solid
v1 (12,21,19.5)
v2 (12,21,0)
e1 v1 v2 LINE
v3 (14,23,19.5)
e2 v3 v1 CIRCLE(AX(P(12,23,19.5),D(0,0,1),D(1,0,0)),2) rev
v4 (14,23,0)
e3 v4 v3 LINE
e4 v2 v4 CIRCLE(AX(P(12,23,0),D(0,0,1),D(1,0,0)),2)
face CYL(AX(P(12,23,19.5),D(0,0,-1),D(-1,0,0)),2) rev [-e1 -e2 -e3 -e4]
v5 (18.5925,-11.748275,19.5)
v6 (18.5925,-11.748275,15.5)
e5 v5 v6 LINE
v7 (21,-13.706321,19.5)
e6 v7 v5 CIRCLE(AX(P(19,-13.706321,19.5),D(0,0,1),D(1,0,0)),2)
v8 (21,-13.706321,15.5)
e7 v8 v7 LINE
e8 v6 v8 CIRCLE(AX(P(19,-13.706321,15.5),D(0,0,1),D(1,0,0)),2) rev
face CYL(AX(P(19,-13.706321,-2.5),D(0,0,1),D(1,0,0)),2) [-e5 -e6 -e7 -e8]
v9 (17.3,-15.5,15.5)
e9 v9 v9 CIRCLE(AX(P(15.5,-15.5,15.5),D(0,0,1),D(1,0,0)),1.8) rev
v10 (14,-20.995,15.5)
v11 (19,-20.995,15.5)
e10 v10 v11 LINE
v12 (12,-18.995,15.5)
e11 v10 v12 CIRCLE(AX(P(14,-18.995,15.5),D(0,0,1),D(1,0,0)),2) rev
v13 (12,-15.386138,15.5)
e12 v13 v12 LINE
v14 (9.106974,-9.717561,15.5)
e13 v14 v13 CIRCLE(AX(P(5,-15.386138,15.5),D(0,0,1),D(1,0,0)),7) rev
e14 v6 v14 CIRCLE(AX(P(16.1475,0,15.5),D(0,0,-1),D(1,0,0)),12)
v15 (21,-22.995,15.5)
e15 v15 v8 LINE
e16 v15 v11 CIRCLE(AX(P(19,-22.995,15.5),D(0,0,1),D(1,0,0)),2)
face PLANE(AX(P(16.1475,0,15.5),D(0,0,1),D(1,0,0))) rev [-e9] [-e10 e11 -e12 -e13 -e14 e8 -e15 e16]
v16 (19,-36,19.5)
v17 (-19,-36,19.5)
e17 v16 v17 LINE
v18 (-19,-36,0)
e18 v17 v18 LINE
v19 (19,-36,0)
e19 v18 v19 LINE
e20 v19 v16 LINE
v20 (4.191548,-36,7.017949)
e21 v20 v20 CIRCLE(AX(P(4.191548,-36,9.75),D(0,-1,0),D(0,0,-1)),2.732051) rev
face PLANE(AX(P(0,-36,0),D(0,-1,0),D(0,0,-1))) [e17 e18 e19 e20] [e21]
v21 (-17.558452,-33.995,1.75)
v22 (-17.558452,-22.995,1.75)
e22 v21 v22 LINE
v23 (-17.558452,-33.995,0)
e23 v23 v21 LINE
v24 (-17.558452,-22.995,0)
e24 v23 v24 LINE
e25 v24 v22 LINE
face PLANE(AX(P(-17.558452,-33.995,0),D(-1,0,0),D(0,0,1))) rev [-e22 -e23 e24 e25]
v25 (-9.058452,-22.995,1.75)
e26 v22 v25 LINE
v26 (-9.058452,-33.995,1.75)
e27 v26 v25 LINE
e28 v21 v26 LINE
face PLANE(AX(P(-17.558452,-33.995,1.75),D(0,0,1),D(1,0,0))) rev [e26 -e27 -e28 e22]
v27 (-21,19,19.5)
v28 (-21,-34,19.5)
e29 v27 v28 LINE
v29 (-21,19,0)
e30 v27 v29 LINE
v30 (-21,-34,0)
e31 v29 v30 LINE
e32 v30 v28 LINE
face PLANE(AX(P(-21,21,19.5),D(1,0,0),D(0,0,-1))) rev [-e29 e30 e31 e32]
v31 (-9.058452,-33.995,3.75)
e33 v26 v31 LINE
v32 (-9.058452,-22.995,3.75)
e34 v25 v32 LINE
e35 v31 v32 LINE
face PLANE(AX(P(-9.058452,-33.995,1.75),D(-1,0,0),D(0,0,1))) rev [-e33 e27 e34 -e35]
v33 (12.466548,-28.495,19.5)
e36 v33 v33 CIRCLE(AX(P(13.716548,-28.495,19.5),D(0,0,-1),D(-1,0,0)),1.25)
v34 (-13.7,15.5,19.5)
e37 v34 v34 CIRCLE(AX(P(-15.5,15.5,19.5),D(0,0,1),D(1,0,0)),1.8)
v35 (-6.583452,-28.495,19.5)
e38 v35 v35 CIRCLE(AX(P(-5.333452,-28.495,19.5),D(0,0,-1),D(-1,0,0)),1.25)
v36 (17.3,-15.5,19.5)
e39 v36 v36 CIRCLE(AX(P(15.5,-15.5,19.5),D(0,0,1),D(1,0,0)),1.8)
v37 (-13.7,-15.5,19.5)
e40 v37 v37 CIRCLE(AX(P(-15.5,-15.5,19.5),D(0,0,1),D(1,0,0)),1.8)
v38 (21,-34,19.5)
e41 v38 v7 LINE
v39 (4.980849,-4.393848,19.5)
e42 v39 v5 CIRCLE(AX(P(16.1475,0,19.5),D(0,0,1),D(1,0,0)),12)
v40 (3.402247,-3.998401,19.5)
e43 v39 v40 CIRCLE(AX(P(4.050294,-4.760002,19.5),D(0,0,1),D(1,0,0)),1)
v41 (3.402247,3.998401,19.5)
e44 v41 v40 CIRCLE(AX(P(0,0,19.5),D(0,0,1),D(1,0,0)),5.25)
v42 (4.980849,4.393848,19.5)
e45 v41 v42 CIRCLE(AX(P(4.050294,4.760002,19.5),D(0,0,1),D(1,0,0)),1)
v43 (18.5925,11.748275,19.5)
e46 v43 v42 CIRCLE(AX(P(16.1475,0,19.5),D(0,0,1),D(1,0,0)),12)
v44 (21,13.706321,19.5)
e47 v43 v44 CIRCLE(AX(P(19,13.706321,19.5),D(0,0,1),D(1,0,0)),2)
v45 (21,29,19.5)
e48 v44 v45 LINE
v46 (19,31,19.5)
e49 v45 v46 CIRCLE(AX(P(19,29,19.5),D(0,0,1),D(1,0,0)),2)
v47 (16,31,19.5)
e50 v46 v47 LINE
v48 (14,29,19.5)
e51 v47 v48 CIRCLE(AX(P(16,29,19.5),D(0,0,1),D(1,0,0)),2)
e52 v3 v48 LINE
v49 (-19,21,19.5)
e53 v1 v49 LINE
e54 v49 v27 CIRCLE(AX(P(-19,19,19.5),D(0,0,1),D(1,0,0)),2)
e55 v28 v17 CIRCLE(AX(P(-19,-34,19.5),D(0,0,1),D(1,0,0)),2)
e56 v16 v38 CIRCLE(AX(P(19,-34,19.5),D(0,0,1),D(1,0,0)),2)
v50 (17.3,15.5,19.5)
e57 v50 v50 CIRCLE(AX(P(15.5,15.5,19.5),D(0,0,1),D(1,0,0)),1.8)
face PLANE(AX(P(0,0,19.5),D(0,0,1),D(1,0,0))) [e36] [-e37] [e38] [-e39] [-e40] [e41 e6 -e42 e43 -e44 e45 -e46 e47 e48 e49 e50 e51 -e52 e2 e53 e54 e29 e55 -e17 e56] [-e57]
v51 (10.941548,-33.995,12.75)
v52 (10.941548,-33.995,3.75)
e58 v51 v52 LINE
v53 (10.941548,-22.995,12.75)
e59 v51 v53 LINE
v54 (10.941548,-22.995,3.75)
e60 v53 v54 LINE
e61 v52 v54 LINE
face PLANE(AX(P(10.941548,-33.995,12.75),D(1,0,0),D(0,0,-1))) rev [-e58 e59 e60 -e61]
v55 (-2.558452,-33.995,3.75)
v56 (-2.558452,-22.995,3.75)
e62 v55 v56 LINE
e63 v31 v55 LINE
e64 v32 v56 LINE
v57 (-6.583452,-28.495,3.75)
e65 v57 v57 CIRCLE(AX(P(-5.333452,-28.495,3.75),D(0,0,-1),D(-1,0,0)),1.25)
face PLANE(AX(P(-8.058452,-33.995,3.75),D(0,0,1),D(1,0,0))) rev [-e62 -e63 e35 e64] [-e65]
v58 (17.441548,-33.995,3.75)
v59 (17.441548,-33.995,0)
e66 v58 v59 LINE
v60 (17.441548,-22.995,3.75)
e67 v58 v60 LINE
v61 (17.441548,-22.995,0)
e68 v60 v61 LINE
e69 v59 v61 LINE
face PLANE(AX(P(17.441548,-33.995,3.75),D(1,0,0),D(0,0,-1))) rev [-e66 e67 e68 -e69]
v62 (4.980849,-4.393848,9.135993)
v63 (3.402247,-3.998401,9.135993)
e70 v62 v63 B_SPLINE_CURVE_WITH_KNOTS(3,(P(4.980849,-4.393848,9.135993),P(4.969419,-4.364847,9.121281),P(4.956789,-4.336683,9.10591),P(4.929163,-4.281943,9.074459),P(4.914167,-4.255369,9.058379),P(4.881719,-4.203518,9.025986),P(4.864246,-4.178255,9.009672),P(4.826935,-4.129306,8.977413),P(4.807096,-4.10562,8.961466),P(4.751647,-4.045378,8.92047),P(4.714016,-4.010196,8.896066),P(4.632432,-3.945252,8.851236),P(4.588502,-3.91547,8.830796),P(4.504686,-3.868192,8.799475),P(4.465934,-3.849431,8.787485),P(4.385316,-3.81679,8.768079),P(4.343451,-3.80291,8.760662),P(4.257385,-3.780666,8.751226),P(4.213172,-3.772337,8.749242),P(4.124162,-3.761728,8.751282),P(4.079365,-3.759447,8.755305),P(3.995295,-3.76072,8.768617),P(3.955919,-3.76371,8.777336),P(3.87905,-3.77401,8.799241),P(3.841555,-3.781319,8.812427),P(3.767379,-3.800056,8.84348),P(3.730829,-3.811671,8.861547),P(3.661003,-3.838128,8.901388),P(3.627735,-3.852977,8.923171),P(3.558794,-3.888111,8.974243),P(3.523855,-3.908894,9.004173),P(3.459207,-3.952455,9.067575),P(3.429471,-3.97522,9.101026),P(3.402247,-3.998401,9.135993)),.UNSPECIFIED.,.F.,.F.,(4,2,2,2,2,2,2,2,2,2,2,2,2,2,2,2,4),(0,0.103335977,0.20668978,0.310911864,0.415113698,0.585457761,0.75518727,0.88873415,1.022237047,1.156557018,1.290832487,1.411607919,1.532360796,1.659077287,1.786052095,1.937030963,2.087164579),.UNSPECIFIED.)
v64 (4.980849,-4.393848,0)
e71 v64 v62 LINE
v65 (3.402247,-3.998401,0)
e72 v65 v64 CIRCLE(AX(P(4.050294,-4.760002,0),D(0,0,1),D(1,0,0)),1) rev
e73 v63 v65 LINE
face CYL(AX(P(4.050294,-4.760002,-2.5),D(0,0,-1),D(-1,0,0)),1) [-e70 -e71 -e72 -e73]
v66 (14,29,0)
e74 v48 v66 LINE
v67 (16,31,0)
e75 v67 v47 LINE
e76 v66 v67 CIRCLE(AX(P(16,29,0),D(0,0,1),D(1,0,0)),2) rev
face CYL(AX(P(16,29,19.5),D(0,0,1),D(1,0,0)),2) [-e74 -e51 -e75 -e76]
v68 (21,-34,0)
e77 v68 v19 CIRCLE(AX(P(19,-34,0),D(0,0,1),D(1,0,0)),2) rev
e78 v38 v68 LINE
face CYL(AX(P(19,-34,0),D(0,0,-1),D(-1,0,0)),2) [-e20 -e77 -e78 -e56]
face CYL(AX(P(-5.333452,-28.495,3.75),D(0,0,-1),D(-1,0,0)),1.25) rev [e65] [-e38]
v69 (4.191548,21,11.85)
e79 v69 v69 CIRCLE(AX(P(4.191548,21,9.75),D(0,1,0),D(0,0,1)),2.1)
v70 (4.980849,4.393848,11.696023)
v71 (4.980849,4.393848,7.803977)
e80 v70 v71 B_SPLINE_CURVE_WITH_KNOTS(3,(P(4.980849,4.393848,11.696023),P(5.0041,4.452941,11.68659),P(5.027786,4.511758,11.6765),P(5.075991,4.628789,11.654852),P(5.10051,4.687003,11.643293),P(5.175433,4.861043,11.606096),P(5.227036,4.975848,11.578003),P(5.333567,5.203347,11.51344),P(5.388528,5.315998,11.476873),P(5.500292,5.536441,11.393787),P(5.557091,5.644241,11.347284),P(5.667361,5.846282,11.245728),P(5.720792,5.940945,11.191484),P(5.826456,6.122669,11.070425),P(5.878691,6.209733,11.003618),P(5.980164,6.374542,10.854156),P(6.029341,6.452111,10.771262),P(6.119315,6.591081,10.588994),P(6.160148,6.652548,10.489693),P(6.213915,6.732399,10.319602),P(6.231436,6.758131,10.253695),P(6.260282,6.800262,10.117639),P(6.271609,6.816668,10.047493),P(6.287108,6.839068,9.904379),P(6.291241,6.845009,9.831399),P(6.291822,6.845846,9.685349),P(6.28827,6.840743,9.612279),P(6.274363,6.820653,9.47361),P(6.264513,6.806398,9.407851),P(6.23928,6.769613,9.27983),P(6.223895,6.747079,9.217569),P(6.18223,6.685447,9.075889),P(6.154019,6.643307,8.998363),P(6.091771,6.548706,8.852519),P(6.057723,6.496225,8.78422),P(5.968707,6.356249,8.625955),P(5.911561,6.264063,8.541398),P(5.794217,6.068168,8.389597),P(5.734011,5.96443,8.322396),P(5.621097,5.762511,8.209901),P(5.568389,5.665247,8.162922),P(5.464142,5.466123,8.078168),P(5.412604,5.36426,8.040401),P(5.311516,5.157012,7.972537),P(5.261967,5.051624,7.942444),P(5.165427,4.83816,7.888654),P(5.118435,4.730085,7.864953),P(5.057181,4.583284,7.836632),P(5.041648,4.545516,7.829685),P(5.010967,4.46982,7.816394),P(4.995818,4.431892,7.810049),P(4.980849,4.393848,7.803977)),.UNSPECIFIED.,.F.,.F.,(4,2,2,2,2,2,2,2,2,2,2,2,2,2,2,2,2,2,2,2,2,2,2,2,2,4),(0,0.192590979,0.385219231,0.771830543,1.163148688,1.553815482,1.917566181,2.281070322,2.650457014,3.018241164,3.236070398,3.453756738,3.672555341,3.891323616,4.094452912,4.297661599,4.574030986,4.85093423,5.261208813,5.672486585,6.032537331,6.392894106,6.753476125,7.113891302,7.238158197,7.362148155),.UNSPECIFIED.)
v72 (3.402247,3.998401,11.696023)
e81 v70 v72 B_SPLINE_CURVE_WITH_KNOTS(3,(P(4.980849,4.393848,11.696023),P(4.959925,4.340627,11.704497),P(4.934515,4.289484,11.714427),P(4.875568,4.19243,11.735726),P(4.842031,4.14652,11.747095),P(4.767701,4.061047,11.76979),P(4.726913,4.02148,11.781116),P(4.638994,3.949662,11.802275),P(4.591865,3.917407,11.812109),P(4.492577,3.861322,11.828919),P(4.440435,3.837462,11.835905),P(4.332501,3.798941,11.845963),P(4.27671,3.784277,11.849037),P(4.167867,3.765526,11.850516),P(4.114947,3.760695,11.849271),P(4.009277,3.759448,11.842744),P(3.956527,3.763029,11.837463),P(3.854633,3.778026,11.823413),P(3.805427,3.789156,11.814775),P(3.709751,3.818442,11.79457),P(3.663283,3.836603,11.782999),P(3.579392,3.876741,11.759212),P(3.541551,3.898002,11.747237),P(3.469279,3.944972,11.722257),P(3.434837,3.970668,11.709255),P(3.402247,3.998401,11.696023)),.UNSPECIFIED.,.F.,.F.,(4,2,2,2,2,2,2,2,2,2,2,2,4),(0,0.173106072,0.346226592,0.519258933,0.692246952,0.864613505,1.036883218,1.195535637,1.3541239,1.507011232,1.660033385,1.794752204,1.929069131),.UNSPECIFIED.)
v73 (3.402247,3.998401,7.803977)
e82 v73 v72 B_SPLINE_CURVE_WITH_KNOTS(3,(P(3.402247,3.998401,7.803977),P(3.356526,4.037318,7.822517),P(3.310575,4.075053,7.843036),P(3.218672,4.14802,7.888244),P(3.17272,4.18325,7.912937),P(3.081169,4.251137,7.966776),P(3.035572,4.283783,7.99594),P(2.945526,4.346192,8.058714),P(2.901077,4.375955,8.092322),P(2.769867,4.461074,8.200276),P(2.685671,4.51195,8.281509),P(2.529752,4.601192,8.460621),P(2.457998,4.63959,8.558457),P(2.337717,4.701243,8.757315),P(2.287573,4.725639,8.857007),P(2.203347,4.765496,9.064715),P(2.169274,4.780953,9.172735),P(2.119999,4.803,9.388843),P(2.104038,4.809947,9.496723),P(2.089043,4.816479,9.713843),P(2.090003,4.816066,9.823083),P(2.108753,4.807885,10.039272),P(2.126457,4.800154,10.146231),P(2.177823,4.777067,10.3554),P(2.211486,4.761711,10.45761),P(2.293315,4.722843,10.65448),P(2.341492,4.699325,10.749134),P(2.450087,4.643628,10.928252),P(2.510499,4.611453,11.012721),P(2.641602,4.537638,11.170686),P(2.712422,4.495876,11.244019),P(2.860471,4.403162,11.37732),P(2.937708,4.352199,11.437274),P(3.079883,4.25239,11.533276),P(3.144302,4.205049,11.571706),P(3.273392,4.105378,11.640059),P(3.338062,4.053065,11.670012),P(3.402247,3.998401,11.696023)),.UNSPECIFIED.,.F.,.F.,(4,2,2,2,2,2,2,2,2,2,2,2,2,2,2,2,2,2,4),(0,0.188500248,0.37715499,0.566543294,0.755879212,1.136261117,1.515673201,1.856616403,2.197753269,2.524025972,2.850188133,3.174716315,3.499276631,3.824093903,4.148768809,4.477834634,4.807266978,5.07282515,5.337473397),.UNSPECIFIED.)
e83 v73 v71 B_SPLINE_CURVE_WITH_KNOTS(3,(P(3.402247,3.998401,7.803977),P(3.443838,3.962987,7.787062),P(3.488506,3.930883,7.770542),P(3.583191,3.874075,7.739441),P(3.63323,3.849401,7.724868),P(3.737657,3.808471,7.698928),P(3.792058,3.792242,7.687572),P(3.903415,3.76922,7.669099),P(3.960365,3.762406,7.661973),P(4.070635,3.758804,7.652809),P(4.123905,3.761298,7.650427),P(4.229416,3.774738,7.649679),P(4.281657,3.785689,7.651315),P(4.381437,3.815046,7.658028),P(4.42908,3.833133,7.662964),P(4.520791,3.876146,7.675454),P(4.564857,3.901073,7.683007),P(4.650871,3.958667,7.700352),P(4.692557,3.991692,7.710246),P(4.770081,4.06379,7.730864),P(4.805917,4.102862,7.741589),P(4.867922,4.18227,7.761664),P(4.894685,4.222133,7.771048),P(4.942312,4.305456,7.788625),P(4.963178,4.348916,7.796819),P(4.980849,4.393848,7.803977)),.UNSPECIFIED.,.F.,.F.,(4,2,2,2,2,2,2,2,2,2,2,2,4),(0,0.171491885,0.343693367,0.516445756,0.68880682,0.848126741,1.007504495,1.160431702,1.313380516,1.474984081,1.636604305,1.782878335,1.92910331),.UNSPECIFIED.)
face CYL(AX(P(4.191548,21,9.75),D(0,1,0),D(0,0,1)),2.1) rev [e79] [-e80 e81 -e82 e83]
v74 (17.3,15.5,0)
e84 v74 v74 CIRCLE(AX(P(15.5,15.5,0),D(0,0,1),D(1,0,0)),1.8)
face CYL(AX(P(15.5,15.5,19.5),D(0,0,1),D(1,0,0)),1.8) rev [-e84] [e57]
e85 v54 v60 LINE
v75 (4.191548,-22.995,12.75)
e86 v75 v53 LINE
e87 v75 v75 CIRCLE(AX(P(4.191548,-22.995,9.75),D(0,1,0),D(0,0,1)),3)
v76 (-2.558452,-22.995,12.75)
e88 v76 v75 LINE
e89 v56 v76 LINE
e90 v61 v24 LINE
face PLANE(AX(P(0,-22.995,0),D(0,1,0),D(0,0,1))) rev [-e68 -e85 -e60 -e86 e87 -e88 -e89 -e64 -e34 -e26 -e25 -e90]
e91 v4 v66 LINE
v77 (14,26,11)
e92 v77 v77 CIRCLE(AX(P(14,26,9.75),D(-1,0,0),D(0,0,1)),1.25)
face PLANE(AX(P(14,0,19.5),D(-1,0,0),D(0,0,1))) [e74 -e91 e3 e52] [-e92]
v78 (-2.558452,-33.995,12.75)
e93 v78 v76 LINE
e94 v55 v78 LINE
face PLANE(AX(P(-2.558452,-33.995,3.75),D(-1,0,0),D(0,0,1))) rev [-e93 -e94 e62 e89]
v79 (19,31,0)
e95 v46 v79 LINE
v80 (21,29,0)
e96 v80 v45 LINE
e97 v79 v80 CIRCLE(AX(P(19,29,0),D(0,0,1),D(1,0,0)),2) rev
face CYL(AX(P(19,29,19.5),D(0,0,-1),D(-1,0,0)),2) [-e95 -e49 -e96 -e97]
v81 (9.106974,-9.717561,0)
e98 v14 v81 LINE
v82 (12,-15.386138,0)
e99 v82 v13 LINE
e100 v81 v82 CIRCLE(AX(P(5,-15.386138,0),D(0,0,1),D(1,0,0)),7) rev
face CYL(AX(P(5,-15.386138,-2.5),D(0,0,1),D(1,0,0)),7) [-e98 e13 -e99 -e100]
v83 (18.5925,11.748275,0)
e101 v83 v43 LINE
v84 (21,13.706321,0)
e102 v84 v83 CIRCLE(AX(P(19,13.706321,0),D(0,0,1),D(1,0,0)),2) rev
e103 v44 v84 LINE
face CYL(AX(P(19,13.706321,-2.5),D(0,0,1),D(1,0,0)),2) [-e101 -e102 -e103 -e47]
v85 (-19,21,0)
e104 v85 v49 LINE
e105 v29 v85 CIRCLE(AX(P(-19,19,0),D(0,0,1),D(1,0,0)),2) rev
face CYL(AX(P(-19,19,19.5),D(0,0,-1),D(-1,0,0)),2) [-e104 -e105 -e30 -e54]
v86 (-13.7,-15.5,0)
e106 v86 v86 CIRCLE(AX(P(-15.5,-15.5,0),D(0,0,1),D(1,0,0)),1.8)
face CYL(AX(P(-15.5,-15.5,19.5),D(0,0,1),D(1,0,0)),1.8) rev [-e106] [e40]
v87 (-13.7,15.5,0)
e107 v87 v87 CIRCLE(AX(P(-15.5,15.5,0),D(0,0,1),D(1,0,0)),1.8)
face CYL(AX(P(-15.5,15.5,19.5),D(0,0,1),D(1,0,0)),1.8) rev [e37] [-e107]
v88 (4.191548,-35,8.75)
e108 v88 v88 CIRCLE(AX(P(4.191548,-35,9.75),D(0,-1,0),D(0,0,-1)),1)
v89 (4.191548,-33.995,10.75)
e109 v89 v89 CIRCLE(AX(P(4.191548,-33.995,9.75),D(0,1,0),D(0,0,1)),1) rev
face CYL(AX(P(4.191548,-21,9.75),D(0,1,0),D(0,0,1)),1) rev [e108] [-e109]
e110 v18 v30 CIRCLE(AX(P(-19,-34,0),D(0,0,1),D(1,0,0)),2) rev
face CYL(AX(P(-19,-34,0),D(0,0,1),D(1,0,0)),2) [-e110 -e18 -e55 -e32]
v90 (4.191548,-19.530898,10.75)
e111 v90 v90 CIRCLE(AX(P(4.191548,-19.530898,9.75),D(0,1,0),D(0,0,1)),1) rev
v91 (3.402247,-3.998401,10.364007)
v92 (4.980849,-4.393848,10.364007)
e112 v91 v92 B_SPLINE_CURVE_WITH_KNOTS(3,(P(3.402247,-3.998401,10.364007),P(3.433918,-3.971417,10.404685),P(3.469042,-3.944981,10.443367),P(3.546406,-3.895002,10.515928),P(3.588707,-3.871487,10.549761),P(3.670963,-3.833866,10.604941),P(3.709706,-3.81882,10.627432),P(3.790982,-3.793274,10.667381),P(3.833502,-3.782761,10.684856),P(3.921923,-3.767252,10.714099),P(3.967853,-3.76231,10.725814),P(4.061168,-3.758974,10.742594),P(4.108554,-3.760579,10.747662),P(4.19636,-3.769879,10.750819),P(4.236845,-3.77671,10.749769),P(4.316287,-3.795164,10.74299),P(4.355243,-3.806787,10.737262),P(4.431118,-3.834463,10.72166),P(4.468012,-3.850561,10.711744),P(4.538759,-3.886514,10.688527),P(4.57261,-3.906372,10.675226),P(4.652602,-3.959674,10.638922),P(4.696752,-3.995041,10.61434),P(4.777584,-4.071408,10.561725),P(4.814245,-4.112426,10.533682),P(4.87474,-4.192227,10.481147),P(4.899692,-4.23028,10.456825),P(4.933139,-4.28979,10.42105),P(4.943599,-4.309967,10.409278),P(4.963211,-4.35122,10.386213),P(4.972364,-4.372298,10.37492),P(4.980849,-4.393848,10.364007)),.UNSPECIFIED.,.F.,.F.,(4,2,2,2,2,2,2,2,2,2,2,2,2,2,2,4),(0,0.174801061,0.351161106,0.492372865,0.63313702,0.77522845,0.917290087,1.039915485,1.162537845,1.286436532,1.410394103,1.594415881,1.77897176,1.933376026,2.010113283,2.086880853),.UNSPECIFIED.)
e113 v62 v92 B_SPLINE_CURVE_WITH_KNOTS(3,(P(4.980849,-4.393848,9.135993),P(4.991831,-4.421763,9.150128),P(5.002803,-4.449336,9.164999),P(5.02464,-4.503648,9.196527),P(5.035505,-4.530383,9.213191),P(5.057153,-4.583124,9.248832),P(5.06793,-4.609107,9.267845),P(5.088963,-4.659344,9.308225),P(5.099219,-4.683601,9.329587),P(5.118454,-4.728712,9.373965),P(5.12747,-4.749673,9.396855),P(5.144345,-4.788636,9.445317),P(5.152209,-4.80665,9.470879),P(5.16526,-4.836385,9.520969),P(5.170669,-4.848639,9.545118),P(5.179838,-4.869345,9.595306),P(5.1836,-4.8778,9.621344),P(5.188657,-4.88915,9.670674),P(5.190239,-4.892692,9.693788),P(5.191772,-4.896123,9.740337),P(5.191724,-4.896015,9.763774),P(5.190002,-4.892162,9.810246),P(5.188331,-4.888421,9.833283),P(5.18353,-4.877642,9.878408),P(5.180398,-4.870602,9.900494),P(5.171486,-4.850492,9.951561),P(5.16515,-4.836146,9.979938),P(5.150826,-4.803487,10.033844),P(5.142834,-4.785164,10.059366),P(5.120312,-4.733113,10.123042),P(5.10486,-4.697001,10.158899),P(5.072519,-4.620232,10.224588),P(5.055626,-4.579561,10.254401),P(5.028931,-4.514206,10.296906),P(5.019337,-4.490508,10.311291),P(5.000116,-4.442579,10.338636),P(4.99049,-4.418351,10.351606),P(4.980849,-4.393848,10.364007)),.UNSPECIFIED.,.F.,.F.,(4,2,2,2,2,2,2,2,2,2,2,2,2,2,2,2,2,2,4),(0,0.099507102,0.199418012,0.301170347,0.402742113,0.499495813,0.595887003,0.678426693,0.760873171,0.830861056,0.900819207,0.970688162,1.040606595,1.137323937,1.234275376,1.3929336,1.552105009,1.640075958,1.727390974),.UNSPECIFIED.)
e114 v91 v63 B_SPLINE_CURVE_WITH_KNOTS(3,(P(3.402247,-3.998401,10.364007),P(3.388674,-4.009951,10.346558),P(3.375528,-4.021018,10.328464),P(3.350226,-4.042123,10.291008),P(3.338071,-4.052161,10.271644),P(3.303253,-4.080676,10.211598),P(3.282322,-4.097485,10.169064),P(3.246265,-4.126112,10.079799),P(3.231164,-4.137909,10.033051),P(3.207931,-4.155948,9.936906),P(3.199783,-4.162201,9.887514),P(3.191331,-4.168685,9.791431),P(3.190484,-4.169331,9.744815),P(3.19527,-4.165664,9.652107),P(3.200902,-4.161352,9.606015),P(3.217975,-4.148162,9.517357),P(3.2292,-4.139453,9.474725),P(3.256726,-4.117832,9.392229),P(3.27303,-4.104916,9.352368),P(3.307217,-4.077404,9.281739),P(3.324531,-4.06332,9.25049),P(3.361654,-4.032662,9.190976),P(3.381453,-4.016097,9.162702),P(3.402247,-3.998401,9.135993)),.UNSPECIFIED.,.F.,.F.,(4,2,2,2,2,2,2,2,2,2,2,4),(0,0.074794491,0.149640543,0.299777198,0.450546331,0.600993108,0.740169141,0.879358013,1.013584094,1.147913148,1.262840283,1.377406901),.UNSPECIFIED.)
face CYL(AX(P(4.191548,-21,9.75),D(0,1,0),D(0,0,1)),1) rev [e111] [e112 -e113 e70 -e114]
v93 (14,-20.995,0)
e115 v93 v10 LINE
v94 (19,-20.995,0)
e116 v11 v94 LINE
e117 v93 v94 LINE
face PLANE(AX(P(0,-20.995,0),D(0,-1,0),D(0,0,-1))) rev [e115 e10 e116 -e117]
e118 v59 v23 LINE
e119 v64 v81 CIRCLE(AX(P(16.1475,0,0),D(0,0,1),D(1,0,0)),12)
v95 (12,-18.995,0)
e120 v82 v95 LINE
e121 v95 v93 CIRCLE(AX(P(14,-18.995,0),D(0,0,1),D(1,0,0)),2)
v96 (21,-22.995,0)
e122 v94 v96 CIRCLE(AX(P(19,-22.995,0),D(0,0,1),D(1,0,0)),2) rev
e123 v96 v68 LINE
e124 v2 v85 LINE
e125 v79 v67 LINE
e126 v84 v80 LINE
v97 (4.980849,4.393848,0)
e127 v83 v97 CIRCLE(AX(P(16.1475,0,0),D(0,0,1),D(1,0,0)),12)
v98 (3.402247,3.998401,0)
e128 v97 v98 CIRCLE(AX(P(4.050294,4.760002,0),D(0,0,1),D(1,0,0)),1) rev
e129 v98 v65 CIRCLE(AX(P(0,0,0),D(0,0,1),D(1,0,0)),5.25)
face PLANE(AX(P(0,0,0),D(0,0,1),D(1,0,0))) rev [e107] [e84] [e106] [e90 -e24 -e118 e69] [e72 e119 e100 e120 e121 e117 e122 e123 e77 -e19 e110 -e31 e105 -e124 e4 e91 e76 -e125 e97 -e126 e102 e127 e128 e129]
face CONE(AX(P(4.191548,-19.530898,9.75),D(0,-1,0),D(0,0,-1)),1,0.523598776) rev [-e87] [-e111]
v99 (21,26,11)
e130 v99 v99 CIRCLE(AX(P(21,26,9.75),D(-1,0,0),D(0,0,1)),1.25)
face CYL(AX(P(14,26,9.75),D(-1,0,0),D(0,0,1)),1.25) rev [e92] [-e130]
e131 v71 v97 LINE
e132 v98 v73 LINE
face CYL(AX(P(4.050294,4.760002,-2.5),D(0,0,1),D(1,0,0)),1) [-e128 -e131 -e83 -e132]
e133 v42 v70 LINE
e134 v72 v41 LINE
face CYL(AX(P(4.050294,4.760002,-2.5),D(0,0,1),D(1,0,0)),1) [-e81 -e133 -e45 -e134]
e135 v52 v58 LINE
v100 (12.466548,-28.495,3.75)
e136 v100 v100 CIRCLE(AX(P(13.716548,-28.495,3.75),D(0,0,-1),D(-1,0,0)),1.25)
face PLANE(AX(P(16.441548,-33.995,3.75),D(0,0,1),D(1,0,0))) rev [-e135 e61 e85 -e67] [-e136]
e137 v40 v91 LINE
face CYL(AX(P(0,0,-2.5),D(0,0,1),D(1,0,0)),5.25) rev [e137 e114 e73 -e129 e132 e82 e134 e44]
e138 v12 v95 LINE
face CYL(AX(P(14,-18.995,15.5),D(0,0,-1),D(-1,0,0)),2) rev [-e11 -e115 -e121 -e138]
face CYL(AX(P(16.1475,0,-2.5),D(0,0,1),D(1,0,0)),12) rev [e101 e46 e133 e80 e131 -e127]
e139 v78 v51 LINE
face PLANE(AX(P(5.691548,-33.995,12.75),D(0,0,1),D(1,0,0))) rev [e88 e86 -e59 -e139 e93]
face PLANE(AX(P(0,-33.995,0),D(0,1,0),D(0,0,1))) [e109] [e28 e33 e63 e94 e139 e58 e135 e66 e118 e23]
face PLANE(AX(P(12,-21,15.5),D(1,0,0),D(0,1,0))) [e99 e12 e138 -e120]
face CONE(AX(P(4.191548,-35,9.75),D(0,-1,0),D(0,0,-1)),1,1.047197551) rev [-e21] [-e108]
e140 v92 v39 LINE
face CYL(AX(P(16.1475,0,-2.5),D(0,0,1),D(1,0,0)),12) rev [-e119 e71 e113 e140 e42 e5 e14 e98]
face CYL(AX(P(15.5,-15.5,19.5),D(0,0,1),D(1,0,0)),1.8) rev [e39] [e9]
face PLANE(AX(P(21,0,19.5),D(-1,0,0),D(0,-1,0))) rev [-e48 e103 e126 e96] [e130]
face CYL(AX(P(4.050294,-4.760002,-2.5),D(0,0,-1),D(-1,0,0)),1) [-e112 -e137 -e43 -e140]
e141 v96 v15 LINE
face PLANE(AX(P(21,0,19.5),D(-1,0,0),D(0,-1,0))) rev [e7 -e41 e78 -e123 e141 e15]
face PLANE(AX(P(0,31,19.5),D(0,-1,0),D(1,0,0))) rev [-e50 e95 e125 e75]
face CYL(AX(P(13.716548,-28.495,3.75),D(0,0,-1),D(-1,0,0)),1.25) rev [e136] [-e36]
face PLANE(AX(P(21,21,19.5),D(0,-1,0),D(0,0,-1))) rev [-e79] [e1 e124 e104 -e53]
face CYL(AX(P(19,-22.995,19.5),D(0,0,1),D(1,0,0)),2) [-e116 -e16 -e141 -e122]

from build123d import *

# Parameters (mm, degrees)
BOSS_EXTRUDE1_DEPTH       = 19.5
SKETCH2_R                 = 5.25
HOBB_CLEARANCE_DEPTH      = 22
M3_CLEARANCE_HOLE1_D      = 3.6
SKETCH6_R                 = 12
CUT_EXTRUDE2_DEPTH        = 22
CUT_EXTRUDE3_START        = 15.5
CUT_EXTRUDE3_DEPTH        = 15.5
M3X0_5_TAPPED_HOLE1_D     = 2.5
FILLET1_R                 = 1
M5X0_8_TAPPED_HOLE1_D     = 4.2
M5X0_8_TAPPED_HOLE1_DEPTH = 21
M5X0_8_TAPPED_HOLE1_TIP   = 1.2618073
SKETCH12_R                = 1
CUT_EXTRUDE4_DEPTH        = 51.845353932
BOSS_EXTRUDE2_DEPTH       = 15
BOSS_EXTRUDE2_DEPTH_BACK  = 0.005
SKETCH14_W                = 42
SKETCH14_H                = 19.5
SKETCH15_R                = 1
CUT_EXTRUDE6_DEPTH        = 26.51413021
CUT_EXTRUDE7_START        = -2
CUT_EXTRUDE7_DEPTH        = 11
M3X0_5_TAPPED_HOLE2_D     = 2.5
FILLET3_R                 = 2
CHAMFER2_SIZE             = 1
CHAMFER2_SIZE2            = 1.732050808
FILLET4_START             = -1
FILLET4_DEPTH             = 16.5


with BuildPart() as part:
    # Sketch1 → Boss-Extrude1 (new body)
    with BuildSketch(Plane.XY):
        Polygon((21, -21), (21, 31), (14, 31), (14, 21), (-21, 21), (-21, -21), align=None)
    extrude(amount=BOSS_EXTRUDE1_DEPTH)

    # Sketch2 → Hobb Clearance (cut)
    with BuildSketch(Plane.XY.offset(19.5)):
        Circle(SKETCH2_R)
    extrude(amount=-HOBB_CLEARANCE_DEPTH, mode=Mode.SUBTRACT)

    # M3 Clearance Hole1 (through all)
    with Locations(Plane.XY.offset(19.5)):
        with Locations((-15.5, 15.5), (15.5, 15.5), (15.5, -15.5), (-15.5, -15.5)):
            Hole(M3_CLEARANCE_HOLE1_D / 2)

    # Sketch6 → Cut-Extrude2 (cut)
    with BuildSketch(Plane.XY.offset(19.5)):
        with Locations((16.1475, 0)):
            Circle(SKETCH6_R)
    extrude(amount=-CUT_EXTRUDE2_DEPTH, mode=Mode.SUBTRACT)

    # Sketch7 → Cut-Extrude3 (cut)
    with BuildSketch(Plane.XY.offset(CUT_EXTRUDE3_START)):
        with BuildLine():
            Line((21, -10.975119305), (21, -21))
            Line((21, -21), (12, -21))
            Line((12, -21), (12, -11.260472626))
            ThreePointArc((12, -11.260472626), (16.527780001, -11.99397295), (21, -10.975119305))
        make_face()
    extrude(amount=-CUT_EXTRUDE3_DEPTH, mode=Mode.SUBTRACT)

    # M3x0.5 Tapped Hole1 (through all)
    with Locations(Plane.ZY.offset(-14)):
        with Locations((9.75, 26)):
            Hole(M3X0_5_TAPPED_HOLE1_D / 2)

    # Fillet1
    fillet1_edges = [part.edges().sort_by_distance(p)[0] for p in [
        (4.468315722, -2.756202933, 9.75),
        (4.468315722, 2.756202933, 9.75),
    ]]
    fillet(fillet1_edges, radius=FILLET1_R)

    # M5x0.8 Tapped Hole1
    with Locations(Plane(origin=(0, 21, 0), x_dir=(1, 0, 0), z_dir=(0, 1, 0))):
        with Locations((4.191547948, -9.75)):
            Hole(M5X0_8_TAPPED_HOLE1_D / 2, depth=M5X0_8_TAPPED_HOLE1_DEPTH)
            with Locations((0, 0, -(M5X0_8_TAPPED_HOLE1_DEPTH + M5X0_8_TAPPED_HOLE1_TIP / 2))):  # 118° drill point
                Cone(0, M5X0_8_TAPPED_HOLE1_D / 2, M5X0_8_TAPPED_HOLE1_TIP, mode=Mode.SUBTRACT)

    # Sketch12 → Cut-Extrude4 (cut, through all)
    with BuildSketch(Plane(origin=(0, 21, 0), x_dir=(1, 0, 0), z_dir=(0, 1, 0))):
        with Locations(Location((4.191547948, -9.75, 0), (0, 0, 270))):
            Circle(SKETCH12_R)
    extrude(amount=-CUT_EXTRUDE4_DEPTH, mode=Mode.SUBTRACT)

    # Sketch14 → Boss-Extrude2 (add, two sides: drawn at the far end of the back side and taken through both)
    with BuildSketch(Plane.XZ.offset(21).offset(-BOSS_EXTRUDE2_DEPTH_BACK)):
        with Locations((0, 9.75)):
            Rectangle(SKETCH14_W, SKETCH14_H)
    extrude(amount=BOSS_EXTRUDE2_DEPTH + BOSS_EXTRUDE2_DEPTH_BACK)

    # Sketch15 → Cut-Extrude6 (cut)
    with BuildSketch(Plane(origin=(0, -20.995, 0), x_dir=(1, 0, 0), z_dir=(0, 1, 0))):
        with Locations(Location((4.191547948, -9.75, 0), (0, 0, 322.12020771))):
            Circle(SKETCH15_R)
    extrude(amount=-CUT_EXTRUDE6_DEPTH, mode=Mode.SUBTRACT)

    # Sketch16 → Cut-Extrude7 (cut)
    with BuildSketch(Plane(origin=(0, -20.995, 0), x_dir=(1, 0, 0), z_dir=(0, 1, 0)).offset(CUT_EXTRUDE7_START)):
        Polygon((-17.558452052, -1.75), (-9.058452052, -1.75), (-9.058452052, -3.75), (-8.058452052, -3.75), (-2.558452052, -3.75), (-2.558452052, -12.75), (2.691547948, -12.75), (5.691547948, -12.75), (10.941547948, -12.75), (10.941547948, -3.75), (16.441547948, -3.75), (17.441547948, -3.75), (17.441547948, 0), (-17.558452052, 0), (-17.558452052, -0.75), align=None)
    extrude(amount=-CUT_EXTRUDE7_DEPTH, mode=Mode.SUBTRACT)

    # M3x0.5 Tapped Hole2 (through all)
    with Locations(Plane(origin=(0, 0, 3.75), x_dir=(-1, 0, 0), z_dir=(0, 0, -1))):
        with Locations((5.333452052, -28.495), (-13.716547948, -28.495)):
            Hole(M3X0_5_TAPPED_HOLE2_D / 2)

    # Chamfer1: read off the stored shape, not the designer's step
    # Chamfer1 outline → Chamfer1 (revolve, cut)
    with BuildSketch(Plane(origin=(4.191547948, 0, 9.75), x_dir=(1, 0, 0), z_dir=(0, 0, 1))):
        Polygon((3, -22.995), (1, -19.530898385), (1, -22.995), align=None)
    revolve(axis=Axis((4.191547948, 0, 9.75), (0, 1, 0)), mode=Mode.SUBTRACT)

    # Fillet3
    fillet3_edges = [part.edges().sort_by_distance(p)[0] for p in [
        (21, -20.995, 7.75),
        (12, -20.995, 7.75),
        (-21, -36, 9.75),
        (21, -36, 9.75),
        (-21, 21, 9.75),
        (21, 10.975119305, 9.75),
        (21, -10.975119305, 17.5),
        (12, -11.260472626, 7.75),
        (14, 31, 9.75),
        (21, 31, 9.75),
        (14, 21, 9.75),
    ]]
    fillet(fillet3_edges, radius=FILLET3_R)

    # Chamfer2
    chamfer2_edges = [part.edges().sort_by_distance(p)[0] for p in [
        (3.40224726, -36, 9.135993141),
    ]]
    chamfer2_side = [part.faces().sort_by_distance(p)[0] for p in [
        (3.40224726, -34.9975, 9.135993141),
    ]]
    chamfer(chamfer2_edges, length=CHAMFER2_SIZE, length2=CHAMFER2_SIZE2, reference=chamfer2_side[0])

    # Fillet4: read off the stored shape, not the designer's step
    # Fillet4 outline → Fillet4 (cut)
    with BuildSketch(Plane.XY.offset(FILLET4_START)):
        with BuildLine():
            ThreePointArc((9.106973684, -9.717560867), (11.234934474, -12.204064485), (12, -15.386138039))
            Line((12, -15.386138039), (12, -12.578085854))
            ThreePointArc((12, -12.578085854), (11.696530072, -11.518941995), (10.878214286, -10.781216446))
            ThreePointArc((10.878214286, -10.781216446), (9.969659856, -10.28757946), (9.106973684, -9.717560867))
        make_face()
    extrude(amount=FILLET4_DEPTH, mode=Mode.SUBTRACT)


solid = part.part
